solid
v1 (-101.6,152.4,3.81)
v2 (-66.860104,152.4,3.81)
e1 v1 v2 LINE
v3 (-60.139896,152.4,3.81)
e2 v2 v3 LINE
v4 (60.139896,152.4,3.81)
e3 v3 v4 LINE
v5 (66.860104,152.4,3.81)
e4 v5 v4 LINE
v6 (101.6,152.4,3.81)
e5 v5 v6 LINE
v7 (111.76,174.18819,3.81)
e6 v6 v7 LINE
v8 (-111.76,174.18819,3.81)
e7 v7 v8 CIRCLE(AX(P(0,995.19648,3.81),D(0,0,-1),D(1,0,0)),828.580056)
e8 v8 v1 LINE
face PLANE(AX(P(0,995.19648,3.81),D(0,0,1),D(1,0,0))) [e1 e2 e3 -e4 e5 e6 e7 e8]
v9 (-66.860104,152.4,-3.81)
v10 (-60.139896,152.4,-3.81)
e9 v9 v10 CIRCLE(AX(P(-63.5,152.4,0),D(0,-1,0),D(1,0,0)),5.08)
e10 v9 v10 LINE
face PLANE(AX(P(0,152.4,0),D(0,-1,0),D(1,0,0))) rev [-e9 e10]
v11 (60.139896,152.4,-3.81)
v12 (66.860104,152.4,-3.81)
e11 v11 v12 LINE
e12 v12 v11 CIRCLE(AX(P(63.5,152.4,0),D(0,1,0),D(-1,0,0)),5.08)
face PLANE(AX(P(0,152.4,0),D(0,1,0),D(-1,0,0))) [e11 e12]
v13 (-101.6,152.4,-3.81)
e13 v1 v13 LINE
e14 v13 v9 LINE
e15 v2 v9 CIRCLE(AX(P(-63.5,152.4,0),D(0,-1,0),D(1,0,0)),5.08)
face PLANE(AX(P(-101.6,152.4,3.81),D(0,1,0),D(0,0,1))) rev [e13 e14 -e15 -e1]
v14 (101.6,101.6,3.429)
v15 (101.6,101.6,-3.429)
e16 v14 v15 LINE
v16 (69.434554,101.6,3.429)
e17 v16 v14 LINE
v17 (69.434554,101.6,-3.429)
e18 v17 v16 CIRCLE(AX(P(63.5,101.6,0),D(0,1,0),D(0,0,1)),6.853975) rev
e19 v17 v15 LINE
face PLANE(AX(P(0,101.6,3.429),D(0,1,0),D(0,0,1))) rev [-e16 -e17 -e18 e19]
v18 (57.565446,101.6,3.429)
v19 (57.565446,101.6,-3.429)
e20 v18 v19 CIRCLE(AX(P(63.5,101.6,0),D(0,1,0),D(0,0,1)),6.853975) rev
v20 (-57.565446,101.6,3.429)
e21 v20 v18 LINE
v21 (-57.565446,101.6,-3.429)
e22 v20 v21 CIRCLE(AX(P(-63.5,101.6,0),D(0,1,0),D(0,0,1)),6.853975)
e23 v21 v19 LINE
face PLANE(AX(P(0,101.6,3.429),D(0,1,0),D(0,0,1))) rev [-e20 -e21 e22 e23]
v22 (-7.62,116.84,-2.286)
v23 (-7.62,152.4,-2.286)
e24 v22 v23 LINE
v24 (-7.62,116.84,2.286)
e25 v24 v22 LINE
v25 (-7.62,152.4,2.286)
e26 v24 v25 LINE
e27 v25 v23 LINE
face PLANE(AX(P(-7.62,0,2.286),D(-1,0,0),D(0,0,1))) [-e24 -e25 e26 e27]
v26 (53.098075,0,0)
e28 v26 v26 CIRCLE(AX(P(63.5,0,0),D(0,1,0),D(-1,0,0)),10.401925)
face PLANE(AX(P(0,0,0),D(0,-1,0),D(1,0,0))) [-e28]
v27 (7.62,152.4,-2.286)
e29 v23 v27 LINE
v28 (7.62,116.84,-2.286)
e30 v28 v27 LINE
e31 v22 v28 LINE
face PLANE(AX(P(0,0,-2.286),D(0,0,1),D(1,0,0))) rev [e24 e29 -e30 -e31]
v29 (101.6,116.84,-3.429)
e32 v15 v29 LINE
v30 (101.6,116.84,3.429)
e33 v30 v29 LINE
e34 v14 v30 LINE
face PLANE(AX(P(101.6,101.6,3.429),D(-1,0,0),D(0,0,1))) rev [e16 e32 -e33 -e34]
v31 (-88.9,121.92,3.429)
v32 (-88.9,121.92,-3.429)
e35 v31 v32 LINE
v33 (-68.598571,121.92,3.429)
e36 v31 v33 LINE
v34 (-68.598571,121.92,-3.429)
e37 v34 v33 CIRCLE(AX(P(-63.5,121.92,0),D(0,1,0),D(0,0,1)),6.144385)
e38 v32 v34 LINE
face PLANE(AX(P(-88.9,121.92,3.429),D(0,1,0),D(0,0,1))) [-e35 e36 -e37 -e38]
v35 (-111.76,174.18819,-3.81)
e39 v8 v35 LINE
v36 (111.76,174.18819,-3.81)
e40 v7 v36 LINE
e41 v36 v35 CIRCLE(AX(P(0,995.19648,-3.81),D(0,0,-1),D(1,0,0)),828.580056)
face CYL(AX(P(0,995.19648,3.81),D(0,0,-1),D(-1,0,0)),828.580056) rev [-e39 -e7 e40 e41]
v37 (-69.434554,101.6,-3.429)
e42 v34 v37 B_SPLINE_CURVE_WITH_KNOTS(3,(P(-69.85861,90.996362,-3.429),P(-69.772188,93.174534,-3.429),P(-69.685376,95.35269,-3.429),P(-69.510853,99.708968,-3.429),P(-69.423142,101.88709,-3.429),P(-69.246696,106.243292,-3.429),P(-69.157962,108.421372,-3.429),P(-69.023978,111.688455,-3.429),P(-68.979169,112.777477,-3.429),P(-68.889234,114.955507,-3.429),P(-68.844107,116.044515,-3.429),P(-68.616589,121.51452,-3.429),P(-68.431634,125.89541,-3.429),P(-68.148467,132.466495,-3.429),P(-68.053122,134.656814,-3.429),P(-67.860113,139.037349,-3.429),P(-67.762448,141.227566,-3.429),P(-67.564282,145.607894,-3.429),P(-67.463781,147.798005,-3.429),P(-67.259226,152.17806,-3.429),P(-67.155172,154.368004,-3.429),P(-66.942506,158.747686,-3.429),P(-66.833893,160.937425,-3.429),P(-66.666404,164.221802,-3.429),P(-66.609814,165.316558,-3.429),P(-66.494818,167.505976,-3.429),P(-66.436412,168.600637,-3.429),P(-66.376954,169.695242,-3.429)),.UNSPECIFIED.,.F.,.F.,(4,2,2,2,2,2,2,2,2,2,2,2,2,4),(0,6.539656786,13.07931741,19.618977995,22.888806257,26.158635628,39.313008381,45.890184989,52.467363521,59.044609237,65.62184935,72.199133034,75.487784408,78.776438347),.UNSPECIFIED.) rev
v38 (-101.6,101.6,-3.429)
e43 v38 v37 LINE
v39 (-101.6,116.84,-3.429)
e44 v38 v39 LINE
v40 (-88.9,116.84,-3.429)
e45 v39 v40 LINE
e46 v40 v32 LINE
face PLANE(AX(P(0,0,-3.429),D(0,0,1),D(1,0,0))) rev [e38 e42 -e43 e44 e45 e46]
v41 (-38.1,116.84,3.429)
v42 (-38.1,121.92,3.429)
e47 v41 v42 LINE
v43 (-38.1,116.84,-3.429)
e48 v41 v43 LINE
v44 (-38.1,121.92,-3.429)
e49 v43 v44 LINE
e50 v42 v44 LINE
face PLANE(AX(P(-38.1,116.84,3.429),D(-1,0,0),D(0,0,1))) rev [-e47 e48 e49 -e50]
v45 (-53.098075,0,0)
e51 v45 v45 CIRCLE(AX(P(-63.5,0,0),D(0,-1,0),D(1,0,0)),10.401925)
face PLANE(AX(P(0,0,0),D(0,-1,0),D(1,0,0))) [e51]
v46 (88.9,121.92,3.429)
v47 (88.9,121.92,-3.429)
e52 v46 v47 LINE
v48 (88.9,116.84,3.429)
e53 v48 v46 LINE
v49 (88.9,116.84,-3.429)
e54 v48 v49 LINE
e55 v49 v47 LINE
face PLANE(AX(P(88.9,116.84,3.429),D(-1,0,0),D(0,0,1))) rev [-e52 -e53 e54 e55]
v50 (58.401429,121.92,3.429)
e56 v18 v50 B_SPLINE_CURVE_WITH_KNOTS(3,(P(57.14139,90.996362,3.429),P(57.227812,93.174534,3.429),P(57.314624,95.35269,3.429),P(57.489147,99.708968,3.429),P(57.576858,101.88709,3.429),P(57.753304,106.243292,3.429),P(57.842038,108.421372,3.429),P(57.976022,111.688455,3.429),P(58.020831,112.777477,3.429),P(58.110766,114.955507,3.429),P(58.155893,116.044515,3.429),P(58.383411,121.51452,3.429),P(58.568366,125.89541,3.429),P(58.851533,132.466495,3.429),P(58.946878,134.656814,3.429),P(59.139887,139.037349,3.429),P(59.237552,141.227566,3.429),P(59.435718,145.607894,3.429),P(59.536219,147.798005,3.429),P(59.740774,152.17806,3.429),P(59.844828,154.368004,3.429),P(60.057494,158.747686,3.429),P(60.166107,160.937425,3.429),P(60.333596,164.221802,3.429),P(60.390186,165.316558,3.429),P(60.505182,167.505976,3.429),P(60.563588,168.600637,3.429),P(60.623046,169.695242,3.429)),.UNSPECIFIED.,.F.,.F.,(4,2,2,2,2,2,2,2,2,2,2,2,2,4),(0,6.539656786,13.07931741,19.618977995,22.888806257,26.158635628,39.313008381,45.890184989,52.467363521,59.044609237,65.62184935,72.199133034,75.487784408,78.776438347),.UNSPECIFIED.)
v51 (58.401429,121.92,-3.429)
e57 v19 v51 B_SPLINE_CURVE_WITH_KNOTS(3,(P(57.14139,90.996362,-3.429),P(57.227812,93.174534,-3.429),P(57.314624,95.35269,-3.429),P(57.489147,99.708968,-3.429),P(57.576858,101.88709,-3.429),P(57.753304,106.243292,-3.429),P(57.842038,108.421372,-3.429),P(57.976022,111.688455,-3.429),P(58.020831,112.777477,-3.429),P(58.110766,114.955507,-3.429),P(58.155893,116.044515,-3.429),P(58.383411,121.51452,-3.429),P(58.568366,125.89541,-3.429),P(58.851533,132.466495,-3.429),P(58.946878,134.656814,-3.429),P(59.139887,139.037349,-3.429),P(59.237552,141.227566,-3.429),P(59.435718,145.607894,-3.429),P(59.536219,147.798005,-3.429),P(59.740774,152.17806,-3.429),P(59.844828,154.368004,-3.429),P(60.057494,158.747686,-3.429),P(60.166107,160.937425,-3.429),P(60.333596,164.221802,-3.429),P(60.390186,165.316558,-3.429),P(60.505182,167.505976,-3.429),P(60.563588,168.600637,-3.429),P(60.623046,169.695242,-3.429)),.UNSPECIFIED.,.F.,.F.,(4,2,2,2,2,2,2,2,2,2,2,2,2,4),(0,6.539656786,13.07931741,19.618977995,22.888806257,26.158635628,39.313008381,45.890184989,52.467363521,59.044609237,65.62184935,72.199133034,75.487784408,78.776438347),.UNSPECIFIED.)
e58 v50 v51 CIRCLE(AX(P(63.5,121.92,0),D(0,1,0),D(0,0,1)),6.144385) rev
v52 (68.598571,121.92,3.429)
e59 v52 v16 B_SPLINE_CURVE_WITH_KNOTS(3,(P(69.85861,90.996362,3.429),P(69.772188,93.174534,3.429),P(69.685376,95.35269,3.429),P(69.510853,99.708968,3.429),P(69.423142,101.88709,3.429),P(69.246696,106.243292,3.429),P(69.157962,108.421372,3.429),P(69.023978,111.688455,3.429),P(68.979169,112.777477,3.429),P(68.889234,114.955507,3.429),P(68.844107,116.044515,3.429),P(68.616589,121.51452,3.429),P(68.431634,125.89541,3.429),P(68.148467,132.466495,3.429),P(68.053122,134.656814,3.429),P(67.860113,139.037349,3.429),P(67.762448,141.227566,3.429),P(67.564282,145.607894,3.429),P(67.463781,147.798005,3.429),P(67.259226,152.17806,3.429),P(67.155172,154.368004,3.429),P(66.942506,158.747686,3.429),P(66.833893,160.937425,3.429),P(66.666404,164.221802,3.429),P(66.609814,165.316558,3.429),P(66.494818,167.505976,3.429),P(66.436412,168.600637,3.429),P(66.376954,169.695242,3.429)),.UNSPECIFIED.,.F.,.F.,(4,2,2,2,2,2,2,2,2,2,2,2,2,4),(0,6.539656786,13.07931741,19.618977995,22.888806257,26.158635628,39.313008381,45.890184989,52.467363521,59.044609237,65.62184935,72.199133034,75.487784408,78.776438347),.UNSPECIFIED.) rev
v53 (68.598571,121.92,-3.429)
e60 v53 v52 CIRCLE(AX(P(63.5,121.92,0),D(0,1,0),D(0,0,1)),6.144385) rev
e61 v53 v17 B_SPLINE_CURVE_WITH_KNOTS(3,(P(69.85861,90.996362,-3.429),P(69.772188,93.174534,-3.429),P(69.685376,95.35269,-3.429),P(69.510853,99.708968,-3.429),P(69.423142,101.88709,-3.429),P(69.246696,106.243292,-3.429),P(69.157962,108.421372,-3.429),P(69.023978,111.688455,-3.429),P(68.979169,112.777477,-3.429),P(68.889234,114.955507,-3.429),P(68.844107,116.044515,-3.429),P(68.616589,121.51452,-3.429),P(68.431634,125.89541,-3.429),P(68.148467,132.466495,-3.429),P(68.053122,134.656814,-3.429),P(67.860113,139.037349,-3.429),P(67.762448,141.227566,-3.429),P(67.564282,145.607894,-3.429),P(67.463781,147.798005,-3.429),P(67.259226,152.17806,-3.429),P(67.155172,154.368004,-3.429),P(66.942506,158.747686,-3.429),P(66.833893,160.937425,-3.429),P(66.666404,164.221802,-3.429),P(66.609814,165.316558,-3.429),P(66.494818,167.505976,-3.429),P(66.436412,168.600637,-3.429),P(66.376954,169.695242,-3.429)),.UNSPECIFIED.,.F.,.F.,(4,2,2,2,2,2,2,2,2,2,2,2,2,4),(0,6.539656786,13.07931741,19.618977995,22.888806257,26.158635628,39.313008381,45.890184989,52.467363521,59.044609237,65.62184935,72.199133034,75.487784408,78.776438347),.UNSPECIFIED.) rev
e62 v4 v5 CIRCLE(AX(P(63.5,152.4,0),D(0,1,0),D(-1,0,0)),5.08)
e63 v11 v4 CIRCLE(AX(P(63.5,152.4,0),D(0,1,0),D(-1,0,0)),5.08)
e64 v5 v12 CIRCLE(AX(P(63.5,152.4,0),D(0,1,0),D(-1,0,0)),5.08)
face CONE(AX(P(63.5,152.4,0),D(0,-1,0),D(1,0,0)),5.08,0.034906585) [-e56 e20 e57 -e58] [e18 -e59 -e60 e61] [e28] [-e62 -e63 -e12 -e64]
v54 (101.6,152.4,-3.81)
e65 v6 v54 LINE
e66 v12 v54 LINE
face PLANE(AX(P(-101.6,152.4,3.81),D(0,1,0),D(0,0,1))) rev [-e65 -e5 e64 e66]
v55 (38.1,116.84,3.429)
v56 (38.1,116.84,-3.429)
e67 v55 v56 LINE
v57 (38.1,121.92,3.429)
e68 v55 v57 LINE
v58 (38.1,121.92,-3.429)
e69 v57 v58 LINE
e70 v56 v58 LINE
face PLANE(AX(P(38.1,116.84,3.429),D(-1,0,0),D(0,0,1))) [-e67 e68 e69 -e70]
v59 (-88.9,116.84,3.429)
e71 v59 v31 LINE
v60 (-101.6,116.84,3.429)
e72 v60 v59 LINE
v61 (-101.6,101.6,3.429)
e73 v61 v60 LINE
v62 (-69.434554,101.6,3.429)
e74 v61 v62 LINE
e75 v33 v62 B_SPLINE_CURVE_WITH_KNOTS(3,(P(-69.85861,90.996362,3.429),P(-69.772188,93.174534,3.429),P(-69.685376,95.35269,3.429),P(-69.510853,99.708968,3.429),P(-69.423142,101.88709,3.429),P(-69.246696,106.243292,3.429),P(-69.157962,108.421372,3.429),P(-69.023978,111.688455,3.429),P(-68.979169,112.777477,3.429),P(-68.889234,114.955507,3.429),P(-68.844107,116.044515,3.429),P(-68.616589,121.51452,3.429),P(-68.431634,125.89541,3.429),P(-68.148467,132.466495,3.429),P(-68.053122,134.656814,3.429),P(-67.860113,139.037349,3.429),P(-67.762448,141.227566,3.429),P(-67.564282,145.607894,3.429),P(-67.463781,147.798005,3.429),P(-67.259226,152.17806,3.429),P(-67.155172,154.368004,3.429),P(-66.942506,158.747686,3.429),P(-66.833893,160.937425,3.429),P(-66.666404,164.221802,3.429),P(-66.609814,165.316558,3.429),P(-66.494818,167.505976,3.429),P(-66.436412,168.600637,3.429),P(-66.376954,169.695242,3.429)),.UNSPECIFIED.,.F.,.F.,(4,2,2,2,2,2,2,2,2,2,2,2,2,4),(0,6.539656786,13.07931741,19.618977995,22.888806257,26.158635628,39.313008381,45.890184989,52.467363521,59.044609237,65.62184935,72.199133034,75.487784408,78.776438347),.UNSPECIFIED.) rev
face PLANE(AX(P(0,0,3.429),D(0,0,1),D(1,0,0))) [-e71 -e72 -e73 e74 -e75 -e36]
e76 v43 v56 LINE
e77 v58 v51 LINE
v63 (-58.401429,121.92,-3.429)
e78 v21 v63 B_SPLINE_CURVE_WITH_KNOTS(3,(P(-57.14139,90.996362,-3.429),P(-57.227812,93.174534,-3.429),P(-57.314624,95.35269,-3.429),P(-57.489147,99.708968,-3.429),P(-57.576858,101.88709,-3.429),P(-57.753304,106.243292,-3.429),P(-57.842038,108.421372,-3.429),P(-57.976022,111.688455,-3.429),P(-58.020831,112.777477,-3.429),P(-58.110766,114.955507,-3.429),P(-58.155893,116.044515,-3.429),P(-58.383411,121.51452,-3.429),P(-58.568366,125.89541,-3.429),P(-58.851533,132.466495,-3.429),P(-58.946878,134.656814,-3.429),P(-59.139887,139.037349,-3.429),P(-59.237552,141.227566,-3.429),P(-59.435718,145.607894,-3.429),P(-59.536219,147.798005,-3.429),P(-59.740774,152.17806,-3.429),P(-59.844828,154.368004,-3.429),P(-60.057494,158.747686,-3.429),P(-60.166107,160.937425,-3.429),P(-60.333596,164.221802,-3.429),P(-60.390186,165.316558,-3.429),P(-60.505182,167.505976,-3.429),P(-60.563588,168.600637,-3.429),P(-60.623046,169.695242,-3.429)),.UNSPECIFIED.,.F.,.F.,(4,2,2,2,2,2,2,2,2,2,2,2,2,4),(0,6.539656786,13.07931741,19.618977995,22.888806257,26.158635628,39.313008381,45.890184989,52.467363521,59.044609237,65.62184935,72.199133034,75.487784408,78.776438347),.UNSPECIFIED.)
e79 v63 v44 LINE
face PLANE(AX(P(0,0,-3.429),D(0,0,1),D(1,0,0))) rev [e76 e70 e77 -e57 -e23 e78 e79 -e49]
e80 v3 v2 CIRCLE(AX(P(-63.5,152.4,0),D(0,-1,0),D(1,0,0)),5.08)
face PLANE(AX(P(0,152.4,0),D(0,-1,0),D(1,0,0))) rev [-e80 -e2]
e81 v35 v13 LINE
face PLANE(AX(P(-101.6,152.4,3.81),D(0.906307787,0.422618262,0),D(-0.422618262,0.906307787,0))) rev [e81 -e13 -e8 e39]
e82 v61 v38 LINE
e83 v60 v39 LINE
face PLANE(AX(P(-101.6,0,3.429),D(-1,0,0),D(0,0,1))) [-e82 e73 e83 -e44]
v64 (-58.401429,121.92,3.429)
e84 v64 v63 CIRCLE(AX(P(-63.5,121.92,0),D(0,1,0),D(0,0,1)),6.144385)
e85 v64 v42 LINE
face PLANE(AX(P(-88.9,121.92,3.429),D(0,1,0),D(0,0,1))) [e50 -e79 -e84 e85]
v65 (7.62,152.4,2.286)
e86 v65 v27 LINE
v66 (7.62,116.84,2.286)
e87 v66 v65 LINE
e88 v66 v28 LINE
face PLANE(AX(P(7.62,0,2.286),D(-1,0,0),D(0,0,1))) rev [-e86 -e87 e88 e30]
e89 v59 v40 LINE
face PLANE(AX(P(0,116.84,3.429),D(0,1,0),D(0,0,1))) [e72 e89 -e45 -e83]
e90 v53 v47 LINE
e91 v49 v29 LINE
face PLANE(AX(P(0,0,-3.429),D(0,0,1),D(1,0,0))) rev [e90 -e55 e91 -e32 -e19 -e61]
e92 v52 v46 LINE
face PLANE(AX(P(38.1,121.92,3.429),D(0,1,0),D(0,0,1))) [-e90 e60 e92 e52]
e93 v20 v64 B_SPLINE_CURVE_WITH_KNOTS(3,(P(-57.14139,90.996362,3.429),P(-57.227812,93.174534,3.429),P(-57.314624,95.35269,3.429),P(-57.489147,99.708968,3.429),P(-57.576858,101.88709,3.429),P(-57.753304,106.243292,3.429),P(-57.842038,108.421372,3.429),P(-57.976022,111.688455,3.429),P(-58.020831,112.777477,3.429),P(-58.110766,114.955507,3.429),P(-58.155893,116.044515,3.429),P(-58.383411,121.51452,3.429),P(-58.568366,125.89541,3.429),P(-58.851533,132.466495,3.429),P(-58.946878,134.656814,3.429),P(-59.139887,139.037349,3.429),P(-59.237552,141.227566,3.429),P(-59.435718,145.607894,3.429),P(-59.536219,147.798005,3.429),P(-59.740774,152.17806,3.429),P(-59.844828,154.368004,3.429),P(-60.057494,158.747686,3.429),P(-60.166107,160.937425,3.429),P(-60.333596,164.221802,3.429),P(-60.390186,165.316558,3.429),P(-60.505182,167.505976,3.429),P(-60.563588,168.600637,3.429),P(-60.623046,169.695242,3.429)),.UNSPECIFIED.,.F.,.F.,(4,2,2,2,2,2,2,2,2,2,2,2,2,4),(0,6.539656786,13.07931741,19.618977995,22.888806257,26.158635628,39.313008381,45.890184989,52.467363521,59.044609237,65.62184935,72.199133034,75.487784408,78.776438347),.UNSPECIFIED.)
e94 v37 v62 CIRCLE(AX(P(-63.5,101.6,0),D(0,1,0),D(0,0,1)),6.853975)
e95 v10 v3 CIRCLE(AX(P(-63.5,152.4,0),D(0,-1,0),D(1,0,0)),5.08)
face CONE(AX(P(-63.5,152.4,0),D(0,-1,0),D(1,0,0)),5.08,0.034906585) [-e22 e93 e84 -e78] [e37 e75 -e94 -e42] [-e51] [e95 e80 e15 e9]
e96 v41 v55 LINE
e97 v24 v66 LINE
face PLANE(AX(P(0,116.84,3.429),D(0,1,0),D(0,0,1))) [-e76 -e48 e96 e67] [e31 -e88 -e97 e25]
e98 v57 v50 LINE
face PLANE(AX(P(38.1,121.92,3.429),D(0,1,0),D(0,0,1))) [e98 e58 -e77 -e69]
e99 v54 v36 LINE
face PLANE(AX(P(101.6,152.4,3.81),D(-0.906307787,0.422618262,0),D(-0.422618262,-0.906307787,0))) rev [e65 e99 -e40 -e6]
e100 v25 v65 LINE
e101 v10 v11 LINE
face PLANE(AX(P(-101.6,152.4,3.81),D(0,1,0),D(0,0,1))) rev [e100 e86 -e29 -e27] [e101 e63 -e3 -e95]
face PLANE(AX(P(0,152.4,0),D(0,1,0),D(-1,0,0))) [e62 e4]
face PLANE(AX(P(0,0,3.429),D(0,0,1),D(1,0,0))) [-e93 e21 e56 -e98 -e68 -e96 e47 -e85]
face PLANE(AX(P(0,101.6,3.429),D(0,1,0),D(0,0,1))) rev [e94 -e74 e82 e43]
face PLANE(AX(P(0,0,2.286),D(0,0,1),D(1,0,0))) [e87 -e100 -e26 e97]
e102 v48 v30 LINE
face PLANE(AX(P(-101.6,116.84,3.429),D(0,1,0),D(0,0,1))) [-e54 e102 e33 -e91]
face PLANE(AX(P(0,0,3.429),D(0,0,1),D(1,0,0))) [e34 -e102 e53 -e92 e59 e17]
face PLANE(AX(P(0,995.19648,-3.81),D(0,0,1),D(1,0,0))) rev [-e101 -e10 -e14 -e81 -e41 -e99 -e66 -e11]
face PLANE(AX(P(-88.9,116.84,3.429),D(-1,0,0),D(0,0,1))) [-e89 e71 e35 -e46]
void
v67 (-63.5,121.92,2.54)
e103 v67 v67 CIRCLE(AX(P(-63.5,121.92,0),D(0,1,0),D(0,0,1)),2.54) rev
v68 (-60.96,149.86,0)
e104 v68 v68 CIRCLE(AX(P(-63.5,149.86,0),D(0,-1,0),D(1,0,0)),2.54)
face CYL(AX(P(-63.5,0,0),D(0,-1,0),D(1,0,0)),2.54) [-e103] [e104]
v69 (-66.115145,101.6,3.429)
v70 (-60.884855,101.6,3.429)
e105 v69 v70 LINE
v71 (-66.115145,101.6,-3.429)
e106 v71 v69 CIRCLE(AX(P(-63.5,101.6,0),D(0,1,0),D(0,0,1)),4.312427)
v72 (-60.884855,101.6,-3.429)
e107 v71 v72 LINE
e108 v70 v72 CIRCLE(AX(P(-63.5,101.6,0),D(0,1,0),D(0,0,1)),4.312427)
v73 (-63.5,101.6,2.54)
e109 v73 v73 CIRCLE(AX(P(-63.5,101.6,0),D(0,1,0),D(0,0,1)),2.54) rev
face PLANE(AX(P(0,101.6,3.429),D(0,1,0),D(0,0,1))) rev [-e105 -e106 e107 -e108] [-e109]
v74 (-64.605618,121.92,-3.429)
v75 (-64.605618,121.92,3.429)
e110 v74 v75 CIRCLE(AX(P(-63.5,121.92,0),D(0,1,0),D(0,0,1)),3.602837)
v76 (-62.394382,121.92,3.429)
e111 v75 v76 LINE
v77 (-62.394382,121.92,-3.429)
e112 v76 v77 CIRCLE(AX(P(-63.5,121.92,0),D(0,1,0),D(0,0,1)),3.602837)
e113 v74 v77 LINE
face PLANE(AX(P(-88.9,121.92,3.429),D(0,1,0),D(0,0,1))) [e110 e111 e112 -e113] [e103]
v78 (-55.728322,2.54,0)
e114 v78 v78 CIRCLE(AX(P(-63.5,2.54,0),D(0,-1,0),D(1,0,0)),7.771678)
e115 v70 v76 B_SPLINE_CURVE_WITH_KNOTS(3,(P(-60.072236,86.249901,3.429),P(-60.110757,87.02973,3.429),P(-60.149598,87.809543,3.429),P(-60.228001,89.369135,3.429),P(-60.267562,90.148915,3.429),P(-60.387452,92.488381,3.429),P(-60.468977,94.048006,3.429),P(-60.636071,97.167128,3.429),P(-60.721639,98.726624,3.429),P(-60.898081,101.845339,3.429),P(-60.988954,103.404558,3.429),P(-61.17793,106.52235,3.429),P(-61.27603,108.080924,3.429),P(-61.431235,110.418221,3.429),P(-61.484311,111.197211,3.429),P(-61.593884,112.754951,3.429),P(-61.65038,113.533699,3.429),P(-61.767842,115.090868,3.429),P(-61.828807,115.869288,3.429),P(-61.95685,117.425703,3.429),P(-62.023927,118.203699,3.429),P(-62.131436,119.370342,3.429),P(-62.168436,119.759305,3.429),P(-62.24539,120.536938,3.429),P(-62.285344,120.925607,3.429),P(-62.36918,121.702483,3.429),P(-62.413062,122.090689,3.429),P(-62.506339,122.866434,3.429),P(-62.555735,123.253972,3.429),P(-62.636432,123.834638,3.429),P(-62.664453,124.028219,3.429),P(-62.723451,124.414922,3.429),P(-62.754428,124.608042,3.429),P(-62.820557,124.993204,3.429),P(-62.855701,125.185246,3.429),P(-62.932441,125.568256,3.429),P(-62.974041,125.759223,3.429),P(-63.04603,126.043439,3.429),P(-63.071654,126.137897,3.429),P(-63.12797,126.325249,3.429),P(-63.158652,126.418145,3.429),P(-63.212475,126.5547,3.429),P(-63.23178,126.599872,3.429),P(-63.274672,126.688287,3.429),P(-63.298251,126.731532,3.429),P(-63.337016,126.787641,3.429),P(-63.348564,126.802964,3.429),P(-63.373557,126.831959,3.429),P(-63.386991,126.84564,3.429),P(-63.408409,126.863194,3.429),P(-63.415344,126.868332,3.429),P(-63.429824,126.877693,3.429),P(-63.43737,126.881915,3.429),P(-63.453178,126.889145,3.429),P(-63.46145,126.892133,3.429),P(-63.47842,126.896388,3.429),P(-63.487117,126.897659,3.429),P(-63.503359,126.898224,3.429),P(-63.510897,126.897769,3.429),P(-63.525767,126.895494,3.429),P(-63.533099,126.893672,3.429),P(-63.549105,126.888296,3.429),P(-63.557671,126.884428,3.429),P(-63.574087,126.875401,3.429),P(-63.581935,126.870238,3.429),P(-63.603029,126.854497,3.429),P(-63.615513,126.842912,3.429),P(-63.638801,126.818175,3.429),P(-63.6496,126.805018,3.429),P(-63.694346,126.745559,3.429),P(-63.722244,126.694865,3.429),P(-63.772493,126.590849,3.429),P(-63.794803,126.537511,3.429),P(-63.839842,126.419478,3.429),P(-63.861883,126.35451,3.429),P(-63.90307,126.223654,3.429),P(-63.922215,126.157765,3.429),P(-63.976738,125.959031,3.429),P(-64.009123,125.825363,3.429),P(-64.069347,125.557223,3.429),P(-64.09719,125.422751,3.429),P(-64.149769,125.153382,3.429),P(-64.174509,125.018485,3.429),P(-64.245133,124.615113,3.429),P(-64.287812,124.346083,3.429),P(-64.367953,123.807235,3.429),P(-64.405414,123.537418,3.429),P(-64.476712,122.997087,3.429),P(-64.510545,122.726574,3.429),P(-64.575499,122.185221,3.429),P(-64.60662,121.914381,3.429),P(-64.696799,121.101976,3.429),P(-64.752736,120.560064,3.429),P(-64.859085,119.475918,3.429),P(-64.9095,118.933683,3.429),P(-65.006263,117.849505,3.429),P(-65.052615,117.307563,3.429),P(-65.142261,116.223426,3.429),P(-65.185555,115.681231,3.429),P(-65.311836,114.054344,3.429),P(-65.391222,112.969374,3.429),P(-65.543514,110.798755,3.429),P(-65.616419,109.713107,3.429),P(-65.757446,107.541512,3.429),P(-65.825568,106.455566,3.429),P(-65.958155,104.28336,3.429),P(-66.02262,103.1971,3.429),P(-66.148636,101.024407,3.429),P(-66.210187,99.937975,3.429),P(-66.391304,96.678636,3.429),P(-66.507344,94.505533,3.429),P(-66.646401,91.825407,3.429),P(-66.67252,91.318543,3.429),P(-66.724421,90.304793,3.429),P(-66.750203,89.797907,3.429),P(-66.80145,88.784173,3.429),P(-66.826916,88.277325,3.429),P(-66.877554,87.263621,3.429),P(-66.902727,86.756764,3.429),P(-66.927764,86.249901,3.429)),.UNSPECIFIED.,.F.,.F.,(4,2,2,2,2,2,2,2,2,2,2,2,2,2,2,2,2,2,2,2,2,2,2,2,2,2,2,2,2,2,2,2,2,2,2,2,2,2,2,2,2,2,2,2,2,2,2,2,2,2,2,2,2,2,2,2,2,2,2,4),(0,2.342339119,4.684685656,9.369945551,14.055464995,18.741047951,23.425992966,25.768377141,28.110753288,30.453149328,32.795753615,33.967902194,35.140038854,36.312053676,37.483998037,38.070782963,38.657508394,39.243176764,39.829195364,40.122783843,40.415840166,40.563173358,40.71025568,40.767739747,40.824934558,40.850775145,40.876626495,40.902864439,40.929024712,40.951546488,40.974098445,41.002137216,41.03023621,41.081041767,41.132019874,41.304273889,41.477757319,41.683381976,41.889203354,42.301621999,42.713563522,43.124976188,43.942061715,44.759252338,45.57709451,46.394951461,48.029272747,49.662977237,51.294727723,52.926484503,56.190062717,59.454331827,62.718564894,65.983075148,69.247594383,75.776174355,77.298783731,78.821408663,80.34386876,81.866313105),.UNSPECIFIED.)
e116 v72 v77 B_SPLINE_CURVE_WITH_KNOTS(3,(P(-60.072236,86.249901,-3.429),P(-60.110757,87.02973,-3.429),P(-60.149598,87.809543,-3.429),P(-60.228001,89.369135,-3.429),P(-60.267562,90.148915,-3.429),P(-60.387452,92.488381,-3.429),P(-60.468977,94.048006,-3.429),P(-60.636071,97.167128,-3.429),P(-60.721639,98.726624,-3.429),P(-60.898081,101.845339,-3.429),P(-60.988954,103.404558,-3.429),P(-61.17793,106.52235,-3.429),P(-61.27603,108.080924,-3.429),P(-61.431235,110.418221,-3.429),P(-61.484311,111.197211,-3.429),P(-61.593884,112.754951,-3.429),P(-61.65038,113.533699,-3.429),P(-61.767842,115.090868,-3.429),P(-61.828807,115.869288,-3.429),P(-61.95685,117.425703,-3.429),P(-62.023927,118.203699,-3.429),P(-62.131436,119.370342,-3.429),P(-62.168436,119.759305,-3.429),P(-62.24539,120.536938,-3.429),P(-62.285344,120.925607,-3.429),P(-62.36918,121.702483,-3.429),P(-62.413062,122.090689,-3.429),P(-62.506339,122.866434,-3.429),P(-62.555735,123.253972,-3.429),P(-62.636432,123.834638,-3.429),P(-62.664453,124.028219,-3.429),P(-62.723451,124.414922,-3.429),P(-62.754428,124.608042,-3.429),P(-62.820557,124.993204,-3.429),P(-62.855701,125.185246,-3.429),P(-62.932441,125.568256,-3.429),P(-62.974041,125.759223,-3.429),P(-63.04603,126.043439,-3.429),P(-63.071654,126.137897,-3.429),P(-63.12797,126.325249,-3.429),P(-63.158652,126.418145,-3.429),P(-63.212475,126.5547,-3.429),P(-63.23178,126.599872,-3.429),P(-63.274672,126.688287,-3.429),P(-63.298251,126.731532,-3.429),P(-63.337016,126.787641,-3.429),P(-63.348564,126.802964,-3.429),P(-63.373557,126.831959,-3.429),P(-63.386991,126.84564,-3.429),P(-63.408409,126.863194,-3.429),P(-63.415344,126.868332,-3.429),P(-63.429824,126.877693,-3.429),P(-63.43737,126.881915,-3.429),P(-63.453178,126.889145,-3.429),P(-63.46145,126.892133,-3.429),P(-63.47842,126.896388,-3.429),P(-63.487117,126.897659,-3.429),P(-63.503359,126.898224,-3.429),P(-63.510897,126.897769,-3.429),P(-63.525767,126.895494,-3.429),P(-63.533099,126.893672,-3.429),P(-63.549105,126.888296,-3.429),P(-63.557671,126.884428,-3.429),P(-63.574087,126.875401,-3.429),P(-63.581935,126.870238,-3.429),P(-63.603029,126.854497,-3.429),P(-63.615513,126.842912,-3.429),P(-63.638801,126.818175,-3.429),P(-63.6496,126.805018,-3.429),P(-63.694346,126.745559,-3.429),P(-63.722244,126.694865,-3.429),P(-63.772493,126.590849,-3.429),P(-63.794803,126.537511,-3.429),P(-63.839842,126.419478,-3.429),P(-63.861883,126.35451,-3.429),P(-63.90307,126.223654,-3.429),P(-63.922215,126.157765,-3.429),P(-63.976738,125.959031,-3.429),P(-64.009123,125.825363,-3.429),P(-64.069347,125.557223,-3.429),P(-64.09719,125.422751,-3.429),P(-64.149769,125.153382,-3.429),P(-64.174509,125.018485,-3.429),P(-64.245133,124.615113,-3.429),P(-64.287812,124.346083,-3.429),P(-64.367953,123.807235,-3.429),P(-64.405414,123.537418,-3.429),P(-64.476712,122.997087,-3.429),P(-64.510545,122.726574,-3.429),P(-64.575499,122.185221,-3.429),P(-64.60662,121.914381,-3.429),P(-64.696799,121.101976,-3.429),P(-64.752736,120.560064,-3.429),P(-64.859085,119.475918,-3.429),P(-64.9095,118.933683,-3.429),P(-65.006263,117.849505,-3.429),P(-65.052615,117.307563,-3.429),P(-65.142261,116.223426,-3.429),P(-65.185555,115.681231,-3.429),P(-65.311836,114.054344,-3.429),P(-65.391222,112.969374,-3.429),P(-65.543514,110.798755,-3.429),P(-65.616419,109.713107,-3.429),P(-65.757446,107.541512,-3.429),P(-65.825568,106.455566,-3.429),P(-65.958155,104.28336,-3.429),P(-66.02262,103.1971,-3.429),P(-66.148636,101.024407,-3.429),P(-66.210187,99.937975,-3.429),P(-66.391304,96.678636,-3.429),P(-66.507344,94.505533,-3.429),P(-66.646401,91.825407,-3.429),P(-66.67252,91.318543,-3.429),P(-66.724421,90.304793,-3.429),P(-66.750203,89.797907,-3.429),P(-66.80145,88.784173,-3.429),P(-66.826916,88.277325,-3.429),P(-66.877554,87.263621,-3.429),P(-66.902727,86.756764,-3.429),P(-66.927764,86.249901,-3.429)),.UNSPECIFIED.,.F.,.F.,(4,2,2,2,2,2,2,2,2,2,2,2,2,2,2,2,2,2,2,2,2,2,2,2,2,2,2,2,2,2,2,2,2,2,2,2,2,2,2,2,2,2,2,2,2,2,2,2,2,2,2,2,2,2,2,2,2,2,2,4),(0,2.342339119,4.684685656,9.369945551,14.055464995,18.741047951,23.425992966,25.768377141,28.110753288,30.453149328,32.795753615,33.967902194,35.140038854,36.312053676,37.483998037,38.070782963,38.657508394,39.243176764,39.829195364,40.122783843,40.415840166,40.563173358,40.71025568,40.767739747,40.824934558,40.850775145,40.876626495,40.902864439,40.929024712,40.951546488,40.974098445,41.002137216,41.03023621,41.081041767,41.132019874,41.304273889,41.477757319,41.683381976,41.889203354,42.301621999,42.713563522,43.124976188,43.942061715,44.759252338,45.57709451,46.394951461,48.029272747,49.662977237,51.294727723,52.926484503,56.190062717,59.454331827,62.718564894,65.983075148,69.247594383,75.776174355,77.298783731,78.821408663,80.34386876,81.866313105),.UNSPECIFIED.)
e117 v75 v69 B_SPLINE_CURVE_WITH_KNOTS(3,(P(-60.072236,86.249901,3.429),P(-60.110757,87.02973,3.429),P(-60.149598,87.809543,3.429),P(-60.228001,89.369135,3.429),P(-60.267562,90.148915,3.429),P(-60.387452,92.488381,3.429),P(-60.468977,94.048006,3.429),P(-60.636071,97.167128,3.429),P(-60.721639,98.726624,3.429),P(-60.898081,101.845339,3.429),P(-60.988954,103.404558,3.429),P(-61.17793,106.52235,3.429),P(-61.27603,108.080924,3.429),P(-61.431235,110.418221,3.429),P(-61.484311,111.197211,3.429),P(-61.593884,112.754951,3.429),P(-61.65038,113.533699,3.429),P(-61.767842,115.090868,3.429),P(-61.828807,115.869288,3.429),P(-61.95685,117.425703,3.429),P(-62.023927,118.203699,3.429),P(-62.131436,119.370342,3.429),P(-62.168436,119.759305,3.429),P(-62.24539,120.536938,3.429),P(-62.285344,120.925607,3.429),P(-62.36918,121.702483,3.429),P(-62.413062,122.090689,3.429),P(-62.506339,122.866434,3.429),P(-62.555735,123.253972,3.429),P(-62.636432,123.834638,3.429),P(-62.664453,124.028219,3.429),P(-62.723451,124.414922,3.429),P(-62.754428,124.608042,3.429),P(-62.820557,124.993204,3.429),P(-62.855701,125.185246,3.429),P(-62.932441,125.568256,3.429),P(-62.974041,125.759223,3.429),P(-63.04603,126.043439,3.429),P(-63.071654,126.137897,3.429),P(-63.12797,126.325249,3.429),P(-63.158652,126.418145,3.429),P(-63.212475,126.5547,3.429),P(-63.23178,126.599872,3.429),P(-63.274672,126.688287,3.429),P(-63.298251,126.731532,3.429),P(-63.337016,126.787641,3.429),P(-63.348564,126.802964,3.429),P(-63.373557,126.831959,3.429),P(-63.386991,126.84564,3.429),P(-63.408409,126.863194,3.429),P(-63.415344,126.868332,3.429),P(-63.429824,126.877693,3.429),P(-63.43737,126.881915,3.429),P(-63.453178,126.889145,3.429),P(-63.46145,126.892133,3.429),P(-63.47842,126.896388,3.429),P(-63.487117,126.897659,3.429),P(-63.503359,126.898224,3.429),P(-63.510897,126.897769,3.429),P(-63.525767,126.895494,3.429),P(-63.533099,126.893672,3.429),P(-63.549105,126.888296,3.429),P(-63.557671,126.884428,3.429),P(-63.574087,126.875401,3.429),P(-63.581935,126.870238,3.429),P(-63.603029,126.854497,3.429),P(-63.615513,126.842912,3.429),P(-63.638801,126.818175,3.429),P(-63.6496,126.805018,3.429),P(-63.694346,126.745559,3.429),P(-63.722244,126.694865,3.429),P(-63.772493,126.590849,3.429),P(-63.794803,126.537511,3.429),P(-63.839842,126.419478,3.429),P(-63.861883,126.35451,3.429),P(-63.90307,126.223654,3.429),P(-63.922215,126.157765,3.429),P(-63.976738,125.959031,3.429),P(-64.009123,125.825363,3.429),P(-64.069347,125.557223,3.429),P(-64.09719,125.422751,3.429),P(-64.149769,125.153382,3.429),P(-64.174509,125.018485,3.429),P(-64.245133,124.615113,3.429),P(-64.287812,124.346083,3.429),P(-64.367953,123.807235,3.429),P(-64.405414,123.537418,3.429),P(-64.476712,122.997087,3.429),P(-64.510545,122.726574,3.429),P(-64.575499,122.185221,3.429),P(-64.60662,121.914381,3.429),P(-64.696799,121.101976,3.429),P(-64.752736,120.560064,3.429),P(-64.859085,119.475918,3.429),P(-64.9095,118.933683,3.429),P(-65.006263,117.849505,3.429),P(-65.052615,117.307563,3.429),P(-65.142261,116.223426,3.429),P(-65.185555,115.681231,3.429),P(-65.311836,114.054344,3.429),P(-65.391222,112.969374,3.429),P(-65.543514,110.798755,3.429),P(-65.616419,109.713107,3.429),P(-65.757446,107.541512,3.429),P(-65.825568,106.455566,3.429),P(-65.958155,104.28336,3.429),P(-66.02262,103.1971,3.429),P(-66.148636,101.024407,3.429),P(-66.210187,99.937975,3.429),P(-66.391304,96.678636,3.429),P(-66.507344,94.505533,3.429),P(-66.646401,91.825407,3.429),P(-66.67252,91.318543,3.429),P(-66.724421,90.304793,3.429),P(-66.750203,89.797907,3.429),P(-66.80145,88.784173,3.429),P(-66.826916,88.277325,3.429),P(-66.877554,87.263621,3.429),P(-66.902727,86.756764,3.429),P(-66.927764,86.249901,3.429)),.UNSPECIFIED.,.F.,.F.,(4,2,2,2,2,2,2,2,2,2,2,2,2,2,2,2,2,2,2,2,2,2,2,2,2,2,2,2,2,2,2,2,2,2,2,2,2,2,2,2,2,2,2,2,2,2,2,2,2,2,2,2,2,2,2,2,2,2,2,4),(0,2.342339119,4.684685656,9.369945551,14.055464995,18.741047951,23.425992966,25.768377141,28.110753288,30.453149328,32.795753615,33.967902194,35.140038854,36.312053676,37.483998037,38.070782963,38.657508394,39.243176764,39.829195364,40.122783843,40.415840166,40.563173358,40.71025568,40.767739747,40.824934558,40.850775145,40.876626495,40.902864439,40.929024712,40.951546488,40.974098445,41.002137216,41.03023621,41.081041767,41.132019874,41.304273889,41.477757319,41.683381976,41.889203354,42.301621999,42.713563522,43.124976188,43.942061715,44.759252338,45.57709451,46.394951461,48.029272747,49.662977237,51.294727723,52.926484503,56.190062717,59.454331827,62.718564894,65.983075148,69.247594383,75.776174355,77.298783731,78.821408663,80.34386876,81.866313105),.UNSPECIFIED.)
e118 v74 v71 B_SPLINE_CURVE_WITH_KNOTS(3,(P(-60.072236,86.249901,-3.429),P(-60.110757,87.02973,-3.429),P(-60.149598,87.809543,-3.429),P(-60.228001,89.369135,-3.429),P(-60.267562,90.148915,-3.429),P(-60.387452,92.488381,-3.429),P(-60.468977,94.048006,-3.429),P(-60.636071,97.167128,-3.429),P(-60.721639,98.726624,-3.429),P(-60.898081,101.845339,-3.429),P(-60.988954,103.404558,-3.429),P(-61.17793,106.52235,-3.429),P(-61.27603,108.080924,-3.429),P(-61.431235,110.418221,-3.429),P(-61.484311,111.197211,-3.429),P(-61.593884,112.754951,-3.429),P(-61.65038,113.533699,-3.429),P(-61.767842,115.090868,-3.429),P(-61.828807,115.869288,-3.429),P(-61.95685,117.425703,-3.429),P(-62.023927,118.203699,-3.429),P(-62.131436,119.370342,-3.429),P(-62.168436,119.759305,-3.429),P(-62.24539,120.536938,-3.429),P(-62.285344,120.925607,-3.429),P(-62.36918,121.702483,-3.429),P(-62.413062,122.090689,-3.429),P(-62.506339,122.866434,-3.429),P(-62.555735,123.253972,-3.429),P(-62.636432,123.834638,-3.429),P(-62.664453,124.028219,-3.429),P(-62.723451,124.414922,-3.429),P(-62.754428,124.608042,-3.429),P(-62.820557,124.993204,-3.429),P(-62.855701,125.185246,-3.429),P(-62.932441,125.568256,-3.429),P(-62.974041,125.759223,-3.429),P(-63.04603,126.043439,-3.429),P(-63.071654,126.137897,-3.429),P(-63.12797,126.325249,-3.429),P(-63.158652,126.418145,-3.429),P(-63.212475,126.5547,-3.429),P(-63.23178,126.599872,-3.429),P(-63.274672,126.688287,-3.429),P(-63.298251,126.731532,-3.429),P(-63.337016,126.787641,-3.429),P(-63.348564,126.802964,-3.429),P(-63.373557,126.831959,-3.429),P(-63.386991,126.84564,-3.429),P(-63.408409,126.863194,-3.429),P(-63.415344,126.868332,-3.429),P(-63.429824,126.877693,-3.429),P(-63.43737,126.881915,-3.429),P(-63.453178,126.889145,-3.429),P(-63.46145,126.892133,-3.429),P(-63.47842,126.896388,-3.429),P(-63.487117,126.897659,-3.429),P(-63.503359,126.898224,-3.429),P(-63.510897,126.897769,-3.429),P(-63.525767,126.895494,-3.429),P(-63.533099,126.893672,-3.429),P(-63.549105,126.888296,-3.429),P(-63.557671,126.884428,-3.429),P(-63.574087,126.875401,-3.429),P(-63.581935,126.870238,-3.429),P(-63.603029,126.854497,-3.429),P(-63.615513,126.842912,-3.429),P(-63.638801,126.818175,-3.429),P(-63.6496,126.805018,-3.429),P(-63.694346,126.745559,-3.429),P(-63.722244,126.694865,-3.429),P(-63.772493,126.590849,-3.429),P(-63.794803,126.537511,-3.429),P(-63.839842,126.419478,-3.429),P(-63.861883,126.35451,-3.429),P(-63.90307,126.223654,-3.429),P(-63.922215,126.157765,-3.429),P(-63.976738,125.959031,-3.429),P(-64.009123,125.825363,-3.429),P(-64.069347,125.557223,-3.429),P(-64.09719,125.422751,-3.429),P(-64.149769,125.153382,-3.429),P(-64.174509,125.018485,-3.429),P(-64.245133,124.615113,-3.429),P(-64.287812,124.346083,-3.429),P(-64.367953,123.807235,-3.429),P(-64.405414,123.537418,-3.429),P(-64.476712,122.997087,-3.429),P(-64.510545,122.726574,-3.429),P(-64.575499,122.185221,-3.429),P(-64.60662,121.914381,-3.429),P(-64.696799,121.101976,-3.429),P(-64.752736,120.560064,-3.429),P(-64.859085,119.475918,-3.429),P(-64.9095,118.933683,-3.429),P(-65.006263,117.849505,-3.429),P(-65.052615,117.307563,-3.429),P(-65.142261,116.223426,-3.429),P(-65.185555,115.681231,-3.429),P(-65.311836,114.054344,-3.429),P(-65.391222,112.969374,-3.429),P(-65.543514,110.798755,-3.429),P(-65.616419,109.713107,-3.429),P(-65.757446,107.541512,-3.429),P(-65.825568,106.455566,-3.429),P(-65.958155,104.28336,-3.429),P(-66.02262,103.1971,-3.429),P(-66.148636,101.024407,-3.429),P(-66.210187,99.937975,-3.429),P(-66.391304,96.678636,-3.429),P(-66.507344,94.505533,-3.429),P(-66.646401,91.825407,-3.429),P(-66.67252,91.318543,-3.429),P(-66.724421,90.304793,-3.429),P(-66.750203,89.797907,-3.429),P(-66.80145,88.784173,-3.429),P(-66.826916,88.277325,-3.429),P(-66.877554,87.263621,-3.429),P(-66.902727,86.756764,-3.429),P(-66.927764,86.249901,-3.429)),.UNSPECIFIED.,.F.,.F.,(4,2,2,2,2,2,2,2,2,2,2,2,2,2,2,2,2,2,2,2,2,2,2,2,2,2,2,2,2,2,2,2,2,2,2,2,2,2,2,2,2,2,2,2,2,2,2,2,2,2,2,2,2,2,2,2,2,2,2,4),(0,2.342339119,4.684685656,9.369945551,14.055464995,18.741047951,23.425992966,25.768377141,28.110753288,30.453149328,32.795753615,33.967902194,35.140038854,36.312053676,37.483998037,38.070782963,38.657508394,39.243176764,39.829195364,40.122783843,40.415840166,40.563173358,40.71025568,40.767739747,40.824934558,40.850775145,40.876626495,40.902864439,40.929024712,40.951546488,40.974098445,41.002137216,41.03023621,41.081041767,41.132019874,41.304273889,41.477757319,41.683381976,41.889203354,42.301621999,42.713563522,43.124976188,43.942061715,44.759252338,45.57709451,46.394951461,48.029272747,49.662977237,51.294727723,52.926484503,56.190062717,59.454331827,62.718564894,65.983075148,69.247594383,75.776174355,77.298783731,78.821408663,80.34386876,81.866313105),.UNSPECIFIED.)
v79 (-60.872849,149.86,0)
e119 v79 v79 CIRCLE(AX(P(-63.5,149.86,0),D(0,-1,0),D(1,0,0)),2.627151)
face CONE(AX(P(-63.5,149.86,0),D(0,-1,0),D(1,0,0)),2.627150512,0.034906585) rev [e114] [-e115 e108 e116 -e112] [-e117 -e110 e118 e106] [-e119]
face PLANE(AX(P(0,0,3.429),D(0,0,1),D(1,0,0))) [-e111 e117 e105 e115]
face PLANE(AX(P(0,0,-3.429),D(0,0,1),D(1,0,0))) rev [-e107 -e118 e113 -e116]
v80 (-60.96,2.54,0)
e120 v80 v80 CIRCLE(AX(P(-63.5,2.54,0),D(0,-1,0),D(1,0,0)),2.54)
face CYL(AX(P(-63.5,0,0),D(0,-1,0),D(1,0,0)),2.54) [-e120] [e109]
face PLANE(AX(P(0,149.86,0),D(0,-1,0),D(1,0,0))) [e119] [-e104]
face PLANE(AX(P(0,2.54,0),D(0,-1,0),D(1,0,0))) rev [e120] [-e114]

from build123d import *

# Parameters (mm, degrees)
SKETCH1_8_W         = 203.2
SKETCH1_8_H         = 15.24
SKETCH1_8_W_2       = 50.8
SKETCH1_8_H_2       = 5.08
BOSS_EXTRUDE1_DEPTH = 3.429
SKETCH1_9_W         = 15.24
SKETCH1_9_H         = 35.56
BOSS_EXTRUDE2_DEPTH = 2.286
BOSS_EXTRUDE3_DEPTH = 3.81


# Read off the part's stored shape, not the designer's step: Revolve-Thin2
with BuildPart() as part:
    # Revolve-Thin2 outline → Revolve-Thin2 (revolve)
    with BuildSketch(Plane(origin=(-63.5, 0, 0), x_dir=(1, 0, 0), z_dir=(0, 0, 1))):
        Polygon((0, 152.4), (0, 0), (10.401925271, 0), (5.08, 152.4), align=None)
        Polygon((2.54, 2.54), (2.54, 149.86), (2.627150512, 149.86), (7.771678274, 2.54), align=None, mode=Mode.SUBTRACT)
    revolve(axis=Axis((-63.5, 0, 0), (0, 1, 0)))



with BuildPart() as body_2:
    # Sketch1<4> → Revolve1 (revolve)
    with BuildSketch(Plane.XY):
        Polygon((53.098074729, 0), (63.5, 0), (63.5, 152.4), (58.42, 152.4), align=None)
    revolve(axis=Axis((63.5, 0, 0), (0, 1, 0)))


with BuildPart() as body_3:
    # Sketch1<8> → Boss-Extrude1 (new, symmetric)
    with BuildSketch(Plane.XY):
        with Locations((0, 109.22)):
            Rectangle(SKETCH1_8_W, SKETCH1_8_H)
        with Locations((63.5, 119.38)):
            Rectangle(SKETCH1_8_W_2, SKETCH1_8_H_2)
        with Locations((-63.5, 119.38)):
            Rectangle(SKETCH1_8_W_2, SKETCH1_8_H_2)
    extrude(amount=BOSS_EXTRUDE1_DEPTH, both=True)

    # Sketch1<9> → Boss-Extrude2 (add, symmetric)
    with BuildSketch(Plane.XY):
        with Locations((0, 134.62)):
            Rectangle(SKETCH1_9_W, SKETCH1_9_H)
    extrude(amount=BOSS_EXTRUDE2_DEPTH, both=True)


with BuildPart() as part_1:
    add(part.part)

    add(body_2.part)  # Boss-Extrude3 merges body 2

    add(body_3.part)  # Boss-Extrude3 merges body 3
    # Sketch3 → Boss-Extrude3 (add, symmetric)
    with BuildSketch(Plane.XY):
        with BuildLine():
            Line((-101.6, 152.4), (101.6, 152.4))
            Line((101.6, 152.4), (111.76, 174.188190312))
            ThreePointArc((111.76, 174.188190312), (0, 166.616423921), (-111.76, 174.188190312))
            Line((-111.76, 174.188190312), (-101.6, 152.4))
        make_face()
    extrude(amount=BOSS_EXTRUDE3_DEPTH, both=True)


solid = part_1.part
